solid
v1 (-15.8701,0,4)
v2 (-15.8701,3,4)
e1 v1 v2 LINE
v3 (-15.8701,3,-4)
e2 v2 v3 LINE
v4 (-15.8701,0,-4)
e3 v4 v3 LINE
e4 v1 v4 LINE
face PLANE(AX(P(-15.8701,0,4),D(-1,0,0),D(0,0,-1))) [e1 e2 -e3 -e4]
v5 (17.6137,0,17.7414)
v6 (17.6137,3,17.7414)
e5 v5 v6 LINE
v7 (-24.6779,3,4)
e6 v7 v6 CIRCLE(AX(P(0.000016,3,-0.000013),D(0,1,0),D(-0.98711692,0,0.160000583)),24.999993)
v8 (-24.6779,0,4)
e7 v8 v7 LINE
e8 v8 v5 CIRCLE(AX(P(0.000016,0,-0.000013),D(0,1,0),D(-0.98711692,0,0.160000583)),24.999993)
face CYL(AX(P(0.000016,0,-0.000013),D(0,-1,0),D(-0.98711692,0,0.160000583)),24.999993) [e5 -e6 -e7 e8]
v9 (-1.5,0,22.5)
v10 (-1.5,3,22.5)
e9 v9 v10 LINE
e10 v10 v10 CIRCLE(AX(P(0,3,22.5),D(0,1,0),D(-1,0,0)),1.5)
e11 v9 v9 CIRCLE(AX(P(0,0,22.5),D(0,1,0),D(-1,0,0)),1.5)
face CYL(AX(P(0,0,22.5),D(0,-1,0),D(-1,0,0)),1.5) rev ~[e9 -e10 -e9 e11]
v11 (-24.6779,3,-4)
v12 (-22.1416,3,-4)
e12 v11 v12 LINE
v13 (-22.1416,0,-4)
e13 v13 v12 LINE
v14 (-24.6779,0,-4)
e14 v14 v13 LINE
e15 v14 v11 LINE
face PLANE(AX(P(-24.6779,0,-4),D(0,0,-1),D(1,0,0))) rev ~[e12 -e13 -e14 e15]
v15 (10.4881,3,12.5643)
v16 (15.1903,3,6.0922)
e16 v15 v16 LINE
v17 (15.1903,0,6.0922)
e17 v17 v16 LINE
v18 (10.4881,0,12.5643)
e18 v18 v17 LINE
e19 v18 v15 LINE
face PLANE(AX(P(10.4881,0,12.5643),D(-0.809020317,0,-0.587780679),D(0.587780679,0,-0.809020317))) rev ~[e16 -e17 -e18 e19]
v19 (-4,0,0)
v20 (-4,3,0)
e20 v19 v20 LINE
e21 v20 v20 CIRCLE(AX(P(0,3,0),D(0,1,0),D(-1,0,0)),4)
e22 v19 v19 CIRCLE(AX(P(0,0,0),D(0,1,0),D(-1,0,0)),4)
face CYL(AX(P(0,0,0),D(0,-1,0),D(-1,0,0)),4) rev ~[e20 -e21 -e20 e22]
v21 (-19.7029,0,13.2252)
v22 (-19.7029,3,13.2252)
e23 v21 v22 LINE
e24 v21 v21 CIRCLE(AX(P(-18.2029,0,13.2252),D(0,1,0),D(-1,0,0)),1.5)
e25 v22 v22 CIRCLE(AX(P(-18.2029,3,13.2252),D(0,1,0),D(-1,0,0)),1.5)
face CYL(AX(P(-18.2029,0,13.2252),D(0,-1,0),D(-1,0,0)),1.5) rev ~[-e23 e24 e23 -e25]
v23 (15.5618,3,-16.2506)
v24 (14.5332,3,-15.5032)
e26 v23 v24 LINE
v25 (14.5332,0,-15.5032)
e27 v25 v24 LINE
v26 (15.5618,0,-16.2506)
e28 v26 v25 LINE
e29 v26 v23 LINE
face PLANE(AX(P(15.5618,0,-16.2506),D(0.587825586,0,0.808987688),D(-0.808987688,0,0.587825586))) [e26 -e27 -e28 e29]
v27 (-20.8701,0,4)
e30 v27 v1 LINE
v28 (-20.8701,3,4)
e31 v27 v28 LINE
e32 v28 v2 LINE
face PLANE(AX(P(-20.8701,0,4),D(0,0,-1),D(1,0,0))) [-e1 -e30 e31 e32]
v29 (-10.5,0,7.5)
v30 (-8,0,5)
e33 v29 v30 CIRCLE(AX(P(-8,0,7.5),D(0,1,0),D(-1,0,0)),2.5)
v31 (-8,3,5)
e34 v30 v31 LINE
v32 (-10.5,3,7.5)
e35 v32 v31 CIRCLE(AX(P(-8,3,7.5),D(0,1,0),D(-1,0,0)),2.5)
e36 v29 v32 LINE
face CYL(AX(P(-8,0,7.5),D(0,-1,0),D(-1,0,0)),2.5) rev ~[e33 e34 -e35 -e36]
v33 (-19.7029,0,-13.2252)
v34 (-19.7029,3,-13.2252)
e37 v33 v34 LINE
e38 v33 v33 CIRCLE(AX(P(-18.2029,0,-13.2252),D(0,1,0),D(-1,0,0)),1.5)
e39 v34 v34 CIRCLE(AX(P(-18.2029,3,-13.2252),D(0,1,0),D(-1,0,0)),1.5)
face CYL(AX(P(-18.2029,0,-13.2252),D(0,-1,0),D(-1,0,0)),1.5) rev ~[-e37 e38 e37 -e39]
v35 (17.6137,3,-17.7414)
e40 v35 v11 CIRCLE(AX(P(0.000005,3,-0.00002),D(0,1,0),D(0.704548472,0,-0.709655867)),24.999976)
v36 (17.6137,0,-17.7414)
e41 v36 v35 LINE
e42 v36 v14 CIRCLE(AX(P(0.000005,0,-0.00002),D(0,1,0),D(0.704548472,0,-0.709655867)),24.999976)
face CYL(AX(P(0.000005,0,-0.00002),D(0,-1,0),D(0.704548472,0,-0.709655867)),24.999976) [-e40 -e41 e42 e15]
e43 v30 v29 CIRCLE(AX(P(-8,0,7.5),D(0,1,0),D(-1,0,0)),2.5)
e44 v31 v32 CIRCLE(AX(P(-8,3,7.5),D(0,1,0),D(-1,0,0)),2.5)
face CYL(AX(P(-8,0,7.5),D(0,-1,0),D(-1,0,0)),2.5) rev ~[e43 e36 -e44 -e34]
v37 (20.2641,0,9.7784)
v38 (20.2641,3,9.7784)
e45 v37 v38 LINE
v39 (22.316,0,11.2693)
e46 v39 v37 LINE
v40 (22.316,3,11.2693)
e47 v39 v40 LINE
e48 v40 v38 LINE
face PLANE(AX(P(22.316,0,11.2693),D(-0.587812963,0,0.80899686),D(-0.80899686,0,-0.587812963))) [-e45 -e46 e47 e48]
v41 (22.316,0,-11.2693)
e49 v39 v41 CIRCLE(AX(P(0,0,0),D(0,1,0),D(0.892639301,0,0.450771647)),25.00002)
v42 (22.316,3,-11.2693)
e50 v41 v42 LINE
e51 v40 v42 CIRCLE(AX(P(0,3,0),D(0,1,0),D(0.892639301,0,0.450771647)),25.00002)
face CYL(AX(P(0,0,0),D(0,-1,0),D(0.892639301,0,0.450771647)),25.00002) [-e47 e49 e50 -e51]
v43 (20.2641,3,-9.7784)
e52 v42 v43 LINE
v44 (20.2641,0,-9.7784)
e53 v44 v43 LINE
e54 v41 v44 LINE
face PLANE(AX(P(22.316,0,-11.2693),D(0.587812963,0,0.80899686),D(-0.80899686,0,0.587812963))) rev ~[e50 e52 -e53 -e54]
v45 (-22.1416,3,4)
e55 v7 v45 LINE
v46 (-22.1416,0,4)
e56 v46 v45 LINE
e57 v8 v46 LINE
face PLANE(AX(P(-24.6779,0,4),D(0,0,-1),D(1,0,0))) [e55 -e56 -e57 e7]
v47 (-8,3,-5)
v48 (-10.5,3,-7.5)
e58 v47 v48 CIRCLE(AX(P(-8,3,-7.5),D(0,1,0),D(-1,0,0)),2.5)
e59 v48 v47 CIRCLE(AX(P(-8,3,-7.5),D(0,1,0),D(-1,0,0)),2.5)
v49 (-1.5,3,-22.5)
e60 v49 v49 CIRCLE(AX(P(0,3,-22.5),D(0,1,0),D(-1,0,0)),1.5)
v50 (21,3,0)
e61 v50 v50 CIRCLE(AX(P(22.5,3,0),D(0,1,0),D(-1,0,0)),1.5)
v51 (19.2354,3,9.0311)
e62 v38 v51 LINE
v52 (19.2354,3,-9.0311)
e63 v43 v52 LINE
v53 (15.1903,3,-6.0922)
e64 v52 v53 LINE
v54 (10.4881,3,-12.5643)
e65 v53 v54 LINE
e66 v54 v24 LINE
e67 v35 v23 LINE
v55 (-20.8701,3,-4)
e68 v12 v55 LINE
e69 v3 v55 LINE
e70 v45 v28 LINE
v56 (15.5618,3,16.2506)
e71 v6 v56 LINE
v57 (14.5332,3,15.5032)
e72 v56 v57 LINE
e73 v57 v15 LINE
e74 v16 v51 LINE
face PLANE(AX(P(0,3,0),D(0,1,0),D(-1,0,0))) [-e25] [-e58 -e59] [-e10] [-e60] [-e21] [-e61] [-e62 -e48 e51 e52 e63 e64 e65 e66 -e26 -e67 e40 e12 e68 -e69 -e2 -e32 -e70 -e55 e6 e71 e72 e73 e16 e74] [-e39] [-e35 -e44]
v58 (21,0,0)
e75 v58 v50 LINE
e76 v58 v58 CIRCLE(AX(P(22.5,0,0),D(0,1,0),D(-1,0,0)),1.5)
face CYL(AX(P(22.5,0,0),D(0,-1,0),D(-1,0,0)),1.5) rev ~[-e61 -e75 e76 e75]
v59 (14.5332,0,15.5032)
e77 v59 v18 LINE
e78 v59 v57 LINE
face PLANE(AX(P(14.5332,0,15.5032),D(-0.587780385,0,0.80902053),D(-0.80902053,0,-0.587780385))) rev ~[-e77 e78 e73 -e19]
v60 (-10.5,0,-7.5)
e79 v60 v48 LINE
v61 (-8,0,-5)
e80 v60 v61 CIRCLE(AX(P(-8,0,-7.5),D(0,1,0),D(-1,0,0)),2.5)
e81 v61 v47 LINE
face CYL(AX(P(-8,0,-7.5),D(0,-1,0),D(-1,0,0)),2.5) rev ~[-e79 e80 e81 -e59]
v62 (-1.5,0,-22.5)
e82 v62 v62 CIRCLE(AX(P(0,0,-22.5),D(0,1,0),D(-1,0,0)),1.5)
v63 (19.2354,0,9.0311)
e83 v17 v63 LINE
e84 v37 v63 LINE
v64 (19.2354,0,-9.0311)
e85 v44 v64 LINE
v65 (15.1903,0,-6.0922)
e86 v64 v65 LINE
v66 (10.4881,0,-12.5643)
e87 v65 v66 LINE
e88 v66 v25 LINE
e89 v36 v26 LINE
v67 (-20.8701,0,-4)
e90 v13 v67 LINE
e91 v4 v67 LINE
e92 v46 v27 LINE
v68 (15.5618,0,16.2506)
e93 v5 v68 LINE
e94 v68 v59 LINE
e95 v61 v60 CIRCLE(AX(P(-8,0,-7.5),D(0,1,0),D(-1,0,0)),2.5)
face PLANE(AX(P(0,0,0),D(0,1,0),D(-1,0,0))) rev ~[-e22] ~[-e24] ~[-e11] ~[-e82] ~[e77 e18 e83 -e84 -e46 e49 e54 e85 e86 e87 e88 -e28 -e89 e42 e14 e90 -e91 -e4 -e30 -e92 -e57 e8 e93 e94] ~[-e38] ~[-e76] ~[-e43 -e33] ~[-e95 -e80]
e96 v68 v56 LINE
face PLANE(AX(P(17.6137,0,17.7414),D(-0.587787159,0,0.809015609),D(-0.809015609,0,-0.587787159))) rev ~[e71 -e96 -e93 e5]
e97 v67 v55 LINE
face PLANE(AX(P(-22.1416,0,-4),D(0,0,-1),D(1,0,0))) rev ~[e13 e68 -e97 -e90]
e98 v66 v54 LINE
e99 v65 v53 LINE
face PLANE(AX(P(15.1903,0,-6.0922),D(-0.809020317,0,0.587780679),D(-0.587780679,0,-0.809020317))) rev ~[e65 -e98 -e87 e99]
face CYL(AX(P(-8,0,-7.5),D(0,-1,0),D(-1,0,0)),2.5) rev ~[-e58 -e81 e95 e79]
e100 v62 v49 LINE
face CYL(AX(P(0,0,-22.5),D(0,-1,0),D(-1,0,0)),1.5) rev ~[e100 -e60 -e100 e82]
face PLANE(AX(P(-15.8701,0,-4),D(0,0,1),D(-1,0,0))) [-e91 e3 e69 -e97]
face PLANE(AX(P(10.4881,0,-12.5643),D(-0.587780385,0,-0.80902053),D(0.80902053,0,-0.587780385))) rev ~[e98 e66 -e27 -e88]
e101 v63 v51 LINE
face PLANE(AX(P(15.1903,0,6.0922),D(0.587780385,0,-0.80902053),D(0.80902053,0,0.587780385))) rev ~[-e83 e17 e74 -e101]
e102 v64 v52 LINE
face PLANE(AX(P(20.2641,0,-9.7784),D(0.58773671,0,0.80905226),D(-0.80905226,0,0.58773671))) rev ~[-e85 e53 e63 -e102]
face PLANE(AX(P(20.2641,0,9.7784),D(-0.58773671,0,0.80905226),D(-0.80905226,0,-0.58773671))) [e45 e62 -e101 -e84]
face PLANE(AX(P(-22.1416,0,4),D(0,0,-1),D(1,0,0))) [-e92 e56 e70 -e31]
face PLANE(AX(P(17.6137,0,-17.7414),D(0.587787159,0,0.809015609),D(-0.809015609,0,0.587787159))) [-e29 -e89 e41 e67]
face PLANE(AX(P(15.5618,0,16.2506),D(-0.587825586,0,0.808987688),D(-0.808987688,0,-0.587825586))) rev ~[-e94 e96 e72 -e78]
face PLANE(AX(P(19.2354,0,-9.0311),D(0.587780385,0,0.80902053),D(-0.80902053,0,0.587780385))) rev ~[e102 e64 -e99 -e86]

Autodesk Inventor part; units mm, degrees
ref_plane "YZ Plane" through (0, 0, 0) normal (1, 0, 0) x (0, 1, 0)
ref_plane "XZ Plane" through (0, 0, 0) normal (0, 1, 0) x (-1, 0, 0)
ref_plane "XY Plane" through (0, 0, 0) normal (0, 0, 1) x (1, 0, 0)
sketch "Sketch1" plane through (0, 0, 0) normal (0, 1, 0) x (-1, 0, 0)
  line L0 (-17.6137, 17.7414) -> (-15.5618, 16.2506)
  line L1 (-23.5374, 22.0452) -> (-13.679, 22.0452) construction
  line L2 (-22.316, 11.2693) -> (-20.2641, 9.7784)
  line L3 (-22.316, -11.2693) -> (-20.2641, -9.7784)
  line L4 (-17.6137, -17.7414) -> (-15.5618, -16.2506)
  line L5 (24.6779, 4) -> (22.1416, 4)
  line L6 (24.6779, -4) -> (22.1416, -4)
  line L7 (-20.2641, -9.7784) -> (-19.2354, -9.0311)
  line L8 (-15.5618, -16.2506) -> (-14.5332, -15.5032)
  line L9 (-20.2641, 9.7784) -> (-19.2354, 9.0311)
  line L10 (-15.5618, 16.2506) -> (-14.5332, 15.5032)
  line L11 (22.1416, 4) -> (20.8701, 4)
  line L12 (22.1416, -4) -> (20.8701, -4)
  arc A0 (-17.6137, -17.7414) -> (24.6779, -4) centre (0, 0) ccw
  arc A1 (24.6779, 4) -> (-17.6137, 17.7414) centre (0, 0) ccw
  arc A2 (-22.316, 11.2693) -> (-22.316, -11.2693) centre (0, 0) ccw
  line L13 (20.8701, 4) -> (15.8701, 4)
  line L14 (15.8701, 4) -> (15.8701, -4)
  line L15 (15.8701, -4) -> (20.8701, -4)
  line L16 (-14.5332, 15.5032) -> (-10.4881, 12.5643)
  line L17 (-10.4881, 12.5643) -> (-15.1903, 6.0922)
  line L18 (-15.1903, 6.0922) -> (-19.2354, 9.0311)
  line L19 (-19.2354, -9.0311) -> (-15.1903, -6.0922)
  line L20 (-15.1903, -6.0922) -> (-10.4881, -12.5643)
  line L21 (-10.4881, -12.5643) -> (-14.5332, -15.5032)
  circle A3 centre (-22.5, 0) radius 1.5
  circle A4 centre (0, 22.5) radius 1.5
  circle A5 centre (18.2029, 13.2252) radius 1.5
  circle A6 centre (18.2029, -13.2252) radius 1.5
  circle A7 centre (0, -22.5) radius 1.5
  circle A8 centre (0, 0) radius 4
  line L22 (0, 0) -> (8, 0)
  line L23 (8, 0) -> (8, 7.5)
  line L24 (8, 0) -> (8, -7.5)
  circle A9 centre (8, -7.5) radius 2.5
  circle A10 centre (8, 7.5) radius 2.5
  point P0 (-28.2397, -15.5731)
  point P1 (-23.5374, -22.0452)
  point P2 (32, -4)
  dimension "d1" = 36
  dimension "d3" = 5
  dimension "d4" = 5
  dimension "d6" = 3
  dimension "d7" = 3
  dimension "d8" = 3
  dimension "d9" = 3
  dimension "d10" = 3
  dimension "d13" = 8
  dimension "d14" = 8
  dimension "d15" = 7.5
  dimension "d16" = 7.5
  dimension "d17" = 5
  dimension "d18" = 5
extrude "Extrusion2" add sketch "Sketch1" along normal blind 3
properties part number "actuatorMountingPlate"
